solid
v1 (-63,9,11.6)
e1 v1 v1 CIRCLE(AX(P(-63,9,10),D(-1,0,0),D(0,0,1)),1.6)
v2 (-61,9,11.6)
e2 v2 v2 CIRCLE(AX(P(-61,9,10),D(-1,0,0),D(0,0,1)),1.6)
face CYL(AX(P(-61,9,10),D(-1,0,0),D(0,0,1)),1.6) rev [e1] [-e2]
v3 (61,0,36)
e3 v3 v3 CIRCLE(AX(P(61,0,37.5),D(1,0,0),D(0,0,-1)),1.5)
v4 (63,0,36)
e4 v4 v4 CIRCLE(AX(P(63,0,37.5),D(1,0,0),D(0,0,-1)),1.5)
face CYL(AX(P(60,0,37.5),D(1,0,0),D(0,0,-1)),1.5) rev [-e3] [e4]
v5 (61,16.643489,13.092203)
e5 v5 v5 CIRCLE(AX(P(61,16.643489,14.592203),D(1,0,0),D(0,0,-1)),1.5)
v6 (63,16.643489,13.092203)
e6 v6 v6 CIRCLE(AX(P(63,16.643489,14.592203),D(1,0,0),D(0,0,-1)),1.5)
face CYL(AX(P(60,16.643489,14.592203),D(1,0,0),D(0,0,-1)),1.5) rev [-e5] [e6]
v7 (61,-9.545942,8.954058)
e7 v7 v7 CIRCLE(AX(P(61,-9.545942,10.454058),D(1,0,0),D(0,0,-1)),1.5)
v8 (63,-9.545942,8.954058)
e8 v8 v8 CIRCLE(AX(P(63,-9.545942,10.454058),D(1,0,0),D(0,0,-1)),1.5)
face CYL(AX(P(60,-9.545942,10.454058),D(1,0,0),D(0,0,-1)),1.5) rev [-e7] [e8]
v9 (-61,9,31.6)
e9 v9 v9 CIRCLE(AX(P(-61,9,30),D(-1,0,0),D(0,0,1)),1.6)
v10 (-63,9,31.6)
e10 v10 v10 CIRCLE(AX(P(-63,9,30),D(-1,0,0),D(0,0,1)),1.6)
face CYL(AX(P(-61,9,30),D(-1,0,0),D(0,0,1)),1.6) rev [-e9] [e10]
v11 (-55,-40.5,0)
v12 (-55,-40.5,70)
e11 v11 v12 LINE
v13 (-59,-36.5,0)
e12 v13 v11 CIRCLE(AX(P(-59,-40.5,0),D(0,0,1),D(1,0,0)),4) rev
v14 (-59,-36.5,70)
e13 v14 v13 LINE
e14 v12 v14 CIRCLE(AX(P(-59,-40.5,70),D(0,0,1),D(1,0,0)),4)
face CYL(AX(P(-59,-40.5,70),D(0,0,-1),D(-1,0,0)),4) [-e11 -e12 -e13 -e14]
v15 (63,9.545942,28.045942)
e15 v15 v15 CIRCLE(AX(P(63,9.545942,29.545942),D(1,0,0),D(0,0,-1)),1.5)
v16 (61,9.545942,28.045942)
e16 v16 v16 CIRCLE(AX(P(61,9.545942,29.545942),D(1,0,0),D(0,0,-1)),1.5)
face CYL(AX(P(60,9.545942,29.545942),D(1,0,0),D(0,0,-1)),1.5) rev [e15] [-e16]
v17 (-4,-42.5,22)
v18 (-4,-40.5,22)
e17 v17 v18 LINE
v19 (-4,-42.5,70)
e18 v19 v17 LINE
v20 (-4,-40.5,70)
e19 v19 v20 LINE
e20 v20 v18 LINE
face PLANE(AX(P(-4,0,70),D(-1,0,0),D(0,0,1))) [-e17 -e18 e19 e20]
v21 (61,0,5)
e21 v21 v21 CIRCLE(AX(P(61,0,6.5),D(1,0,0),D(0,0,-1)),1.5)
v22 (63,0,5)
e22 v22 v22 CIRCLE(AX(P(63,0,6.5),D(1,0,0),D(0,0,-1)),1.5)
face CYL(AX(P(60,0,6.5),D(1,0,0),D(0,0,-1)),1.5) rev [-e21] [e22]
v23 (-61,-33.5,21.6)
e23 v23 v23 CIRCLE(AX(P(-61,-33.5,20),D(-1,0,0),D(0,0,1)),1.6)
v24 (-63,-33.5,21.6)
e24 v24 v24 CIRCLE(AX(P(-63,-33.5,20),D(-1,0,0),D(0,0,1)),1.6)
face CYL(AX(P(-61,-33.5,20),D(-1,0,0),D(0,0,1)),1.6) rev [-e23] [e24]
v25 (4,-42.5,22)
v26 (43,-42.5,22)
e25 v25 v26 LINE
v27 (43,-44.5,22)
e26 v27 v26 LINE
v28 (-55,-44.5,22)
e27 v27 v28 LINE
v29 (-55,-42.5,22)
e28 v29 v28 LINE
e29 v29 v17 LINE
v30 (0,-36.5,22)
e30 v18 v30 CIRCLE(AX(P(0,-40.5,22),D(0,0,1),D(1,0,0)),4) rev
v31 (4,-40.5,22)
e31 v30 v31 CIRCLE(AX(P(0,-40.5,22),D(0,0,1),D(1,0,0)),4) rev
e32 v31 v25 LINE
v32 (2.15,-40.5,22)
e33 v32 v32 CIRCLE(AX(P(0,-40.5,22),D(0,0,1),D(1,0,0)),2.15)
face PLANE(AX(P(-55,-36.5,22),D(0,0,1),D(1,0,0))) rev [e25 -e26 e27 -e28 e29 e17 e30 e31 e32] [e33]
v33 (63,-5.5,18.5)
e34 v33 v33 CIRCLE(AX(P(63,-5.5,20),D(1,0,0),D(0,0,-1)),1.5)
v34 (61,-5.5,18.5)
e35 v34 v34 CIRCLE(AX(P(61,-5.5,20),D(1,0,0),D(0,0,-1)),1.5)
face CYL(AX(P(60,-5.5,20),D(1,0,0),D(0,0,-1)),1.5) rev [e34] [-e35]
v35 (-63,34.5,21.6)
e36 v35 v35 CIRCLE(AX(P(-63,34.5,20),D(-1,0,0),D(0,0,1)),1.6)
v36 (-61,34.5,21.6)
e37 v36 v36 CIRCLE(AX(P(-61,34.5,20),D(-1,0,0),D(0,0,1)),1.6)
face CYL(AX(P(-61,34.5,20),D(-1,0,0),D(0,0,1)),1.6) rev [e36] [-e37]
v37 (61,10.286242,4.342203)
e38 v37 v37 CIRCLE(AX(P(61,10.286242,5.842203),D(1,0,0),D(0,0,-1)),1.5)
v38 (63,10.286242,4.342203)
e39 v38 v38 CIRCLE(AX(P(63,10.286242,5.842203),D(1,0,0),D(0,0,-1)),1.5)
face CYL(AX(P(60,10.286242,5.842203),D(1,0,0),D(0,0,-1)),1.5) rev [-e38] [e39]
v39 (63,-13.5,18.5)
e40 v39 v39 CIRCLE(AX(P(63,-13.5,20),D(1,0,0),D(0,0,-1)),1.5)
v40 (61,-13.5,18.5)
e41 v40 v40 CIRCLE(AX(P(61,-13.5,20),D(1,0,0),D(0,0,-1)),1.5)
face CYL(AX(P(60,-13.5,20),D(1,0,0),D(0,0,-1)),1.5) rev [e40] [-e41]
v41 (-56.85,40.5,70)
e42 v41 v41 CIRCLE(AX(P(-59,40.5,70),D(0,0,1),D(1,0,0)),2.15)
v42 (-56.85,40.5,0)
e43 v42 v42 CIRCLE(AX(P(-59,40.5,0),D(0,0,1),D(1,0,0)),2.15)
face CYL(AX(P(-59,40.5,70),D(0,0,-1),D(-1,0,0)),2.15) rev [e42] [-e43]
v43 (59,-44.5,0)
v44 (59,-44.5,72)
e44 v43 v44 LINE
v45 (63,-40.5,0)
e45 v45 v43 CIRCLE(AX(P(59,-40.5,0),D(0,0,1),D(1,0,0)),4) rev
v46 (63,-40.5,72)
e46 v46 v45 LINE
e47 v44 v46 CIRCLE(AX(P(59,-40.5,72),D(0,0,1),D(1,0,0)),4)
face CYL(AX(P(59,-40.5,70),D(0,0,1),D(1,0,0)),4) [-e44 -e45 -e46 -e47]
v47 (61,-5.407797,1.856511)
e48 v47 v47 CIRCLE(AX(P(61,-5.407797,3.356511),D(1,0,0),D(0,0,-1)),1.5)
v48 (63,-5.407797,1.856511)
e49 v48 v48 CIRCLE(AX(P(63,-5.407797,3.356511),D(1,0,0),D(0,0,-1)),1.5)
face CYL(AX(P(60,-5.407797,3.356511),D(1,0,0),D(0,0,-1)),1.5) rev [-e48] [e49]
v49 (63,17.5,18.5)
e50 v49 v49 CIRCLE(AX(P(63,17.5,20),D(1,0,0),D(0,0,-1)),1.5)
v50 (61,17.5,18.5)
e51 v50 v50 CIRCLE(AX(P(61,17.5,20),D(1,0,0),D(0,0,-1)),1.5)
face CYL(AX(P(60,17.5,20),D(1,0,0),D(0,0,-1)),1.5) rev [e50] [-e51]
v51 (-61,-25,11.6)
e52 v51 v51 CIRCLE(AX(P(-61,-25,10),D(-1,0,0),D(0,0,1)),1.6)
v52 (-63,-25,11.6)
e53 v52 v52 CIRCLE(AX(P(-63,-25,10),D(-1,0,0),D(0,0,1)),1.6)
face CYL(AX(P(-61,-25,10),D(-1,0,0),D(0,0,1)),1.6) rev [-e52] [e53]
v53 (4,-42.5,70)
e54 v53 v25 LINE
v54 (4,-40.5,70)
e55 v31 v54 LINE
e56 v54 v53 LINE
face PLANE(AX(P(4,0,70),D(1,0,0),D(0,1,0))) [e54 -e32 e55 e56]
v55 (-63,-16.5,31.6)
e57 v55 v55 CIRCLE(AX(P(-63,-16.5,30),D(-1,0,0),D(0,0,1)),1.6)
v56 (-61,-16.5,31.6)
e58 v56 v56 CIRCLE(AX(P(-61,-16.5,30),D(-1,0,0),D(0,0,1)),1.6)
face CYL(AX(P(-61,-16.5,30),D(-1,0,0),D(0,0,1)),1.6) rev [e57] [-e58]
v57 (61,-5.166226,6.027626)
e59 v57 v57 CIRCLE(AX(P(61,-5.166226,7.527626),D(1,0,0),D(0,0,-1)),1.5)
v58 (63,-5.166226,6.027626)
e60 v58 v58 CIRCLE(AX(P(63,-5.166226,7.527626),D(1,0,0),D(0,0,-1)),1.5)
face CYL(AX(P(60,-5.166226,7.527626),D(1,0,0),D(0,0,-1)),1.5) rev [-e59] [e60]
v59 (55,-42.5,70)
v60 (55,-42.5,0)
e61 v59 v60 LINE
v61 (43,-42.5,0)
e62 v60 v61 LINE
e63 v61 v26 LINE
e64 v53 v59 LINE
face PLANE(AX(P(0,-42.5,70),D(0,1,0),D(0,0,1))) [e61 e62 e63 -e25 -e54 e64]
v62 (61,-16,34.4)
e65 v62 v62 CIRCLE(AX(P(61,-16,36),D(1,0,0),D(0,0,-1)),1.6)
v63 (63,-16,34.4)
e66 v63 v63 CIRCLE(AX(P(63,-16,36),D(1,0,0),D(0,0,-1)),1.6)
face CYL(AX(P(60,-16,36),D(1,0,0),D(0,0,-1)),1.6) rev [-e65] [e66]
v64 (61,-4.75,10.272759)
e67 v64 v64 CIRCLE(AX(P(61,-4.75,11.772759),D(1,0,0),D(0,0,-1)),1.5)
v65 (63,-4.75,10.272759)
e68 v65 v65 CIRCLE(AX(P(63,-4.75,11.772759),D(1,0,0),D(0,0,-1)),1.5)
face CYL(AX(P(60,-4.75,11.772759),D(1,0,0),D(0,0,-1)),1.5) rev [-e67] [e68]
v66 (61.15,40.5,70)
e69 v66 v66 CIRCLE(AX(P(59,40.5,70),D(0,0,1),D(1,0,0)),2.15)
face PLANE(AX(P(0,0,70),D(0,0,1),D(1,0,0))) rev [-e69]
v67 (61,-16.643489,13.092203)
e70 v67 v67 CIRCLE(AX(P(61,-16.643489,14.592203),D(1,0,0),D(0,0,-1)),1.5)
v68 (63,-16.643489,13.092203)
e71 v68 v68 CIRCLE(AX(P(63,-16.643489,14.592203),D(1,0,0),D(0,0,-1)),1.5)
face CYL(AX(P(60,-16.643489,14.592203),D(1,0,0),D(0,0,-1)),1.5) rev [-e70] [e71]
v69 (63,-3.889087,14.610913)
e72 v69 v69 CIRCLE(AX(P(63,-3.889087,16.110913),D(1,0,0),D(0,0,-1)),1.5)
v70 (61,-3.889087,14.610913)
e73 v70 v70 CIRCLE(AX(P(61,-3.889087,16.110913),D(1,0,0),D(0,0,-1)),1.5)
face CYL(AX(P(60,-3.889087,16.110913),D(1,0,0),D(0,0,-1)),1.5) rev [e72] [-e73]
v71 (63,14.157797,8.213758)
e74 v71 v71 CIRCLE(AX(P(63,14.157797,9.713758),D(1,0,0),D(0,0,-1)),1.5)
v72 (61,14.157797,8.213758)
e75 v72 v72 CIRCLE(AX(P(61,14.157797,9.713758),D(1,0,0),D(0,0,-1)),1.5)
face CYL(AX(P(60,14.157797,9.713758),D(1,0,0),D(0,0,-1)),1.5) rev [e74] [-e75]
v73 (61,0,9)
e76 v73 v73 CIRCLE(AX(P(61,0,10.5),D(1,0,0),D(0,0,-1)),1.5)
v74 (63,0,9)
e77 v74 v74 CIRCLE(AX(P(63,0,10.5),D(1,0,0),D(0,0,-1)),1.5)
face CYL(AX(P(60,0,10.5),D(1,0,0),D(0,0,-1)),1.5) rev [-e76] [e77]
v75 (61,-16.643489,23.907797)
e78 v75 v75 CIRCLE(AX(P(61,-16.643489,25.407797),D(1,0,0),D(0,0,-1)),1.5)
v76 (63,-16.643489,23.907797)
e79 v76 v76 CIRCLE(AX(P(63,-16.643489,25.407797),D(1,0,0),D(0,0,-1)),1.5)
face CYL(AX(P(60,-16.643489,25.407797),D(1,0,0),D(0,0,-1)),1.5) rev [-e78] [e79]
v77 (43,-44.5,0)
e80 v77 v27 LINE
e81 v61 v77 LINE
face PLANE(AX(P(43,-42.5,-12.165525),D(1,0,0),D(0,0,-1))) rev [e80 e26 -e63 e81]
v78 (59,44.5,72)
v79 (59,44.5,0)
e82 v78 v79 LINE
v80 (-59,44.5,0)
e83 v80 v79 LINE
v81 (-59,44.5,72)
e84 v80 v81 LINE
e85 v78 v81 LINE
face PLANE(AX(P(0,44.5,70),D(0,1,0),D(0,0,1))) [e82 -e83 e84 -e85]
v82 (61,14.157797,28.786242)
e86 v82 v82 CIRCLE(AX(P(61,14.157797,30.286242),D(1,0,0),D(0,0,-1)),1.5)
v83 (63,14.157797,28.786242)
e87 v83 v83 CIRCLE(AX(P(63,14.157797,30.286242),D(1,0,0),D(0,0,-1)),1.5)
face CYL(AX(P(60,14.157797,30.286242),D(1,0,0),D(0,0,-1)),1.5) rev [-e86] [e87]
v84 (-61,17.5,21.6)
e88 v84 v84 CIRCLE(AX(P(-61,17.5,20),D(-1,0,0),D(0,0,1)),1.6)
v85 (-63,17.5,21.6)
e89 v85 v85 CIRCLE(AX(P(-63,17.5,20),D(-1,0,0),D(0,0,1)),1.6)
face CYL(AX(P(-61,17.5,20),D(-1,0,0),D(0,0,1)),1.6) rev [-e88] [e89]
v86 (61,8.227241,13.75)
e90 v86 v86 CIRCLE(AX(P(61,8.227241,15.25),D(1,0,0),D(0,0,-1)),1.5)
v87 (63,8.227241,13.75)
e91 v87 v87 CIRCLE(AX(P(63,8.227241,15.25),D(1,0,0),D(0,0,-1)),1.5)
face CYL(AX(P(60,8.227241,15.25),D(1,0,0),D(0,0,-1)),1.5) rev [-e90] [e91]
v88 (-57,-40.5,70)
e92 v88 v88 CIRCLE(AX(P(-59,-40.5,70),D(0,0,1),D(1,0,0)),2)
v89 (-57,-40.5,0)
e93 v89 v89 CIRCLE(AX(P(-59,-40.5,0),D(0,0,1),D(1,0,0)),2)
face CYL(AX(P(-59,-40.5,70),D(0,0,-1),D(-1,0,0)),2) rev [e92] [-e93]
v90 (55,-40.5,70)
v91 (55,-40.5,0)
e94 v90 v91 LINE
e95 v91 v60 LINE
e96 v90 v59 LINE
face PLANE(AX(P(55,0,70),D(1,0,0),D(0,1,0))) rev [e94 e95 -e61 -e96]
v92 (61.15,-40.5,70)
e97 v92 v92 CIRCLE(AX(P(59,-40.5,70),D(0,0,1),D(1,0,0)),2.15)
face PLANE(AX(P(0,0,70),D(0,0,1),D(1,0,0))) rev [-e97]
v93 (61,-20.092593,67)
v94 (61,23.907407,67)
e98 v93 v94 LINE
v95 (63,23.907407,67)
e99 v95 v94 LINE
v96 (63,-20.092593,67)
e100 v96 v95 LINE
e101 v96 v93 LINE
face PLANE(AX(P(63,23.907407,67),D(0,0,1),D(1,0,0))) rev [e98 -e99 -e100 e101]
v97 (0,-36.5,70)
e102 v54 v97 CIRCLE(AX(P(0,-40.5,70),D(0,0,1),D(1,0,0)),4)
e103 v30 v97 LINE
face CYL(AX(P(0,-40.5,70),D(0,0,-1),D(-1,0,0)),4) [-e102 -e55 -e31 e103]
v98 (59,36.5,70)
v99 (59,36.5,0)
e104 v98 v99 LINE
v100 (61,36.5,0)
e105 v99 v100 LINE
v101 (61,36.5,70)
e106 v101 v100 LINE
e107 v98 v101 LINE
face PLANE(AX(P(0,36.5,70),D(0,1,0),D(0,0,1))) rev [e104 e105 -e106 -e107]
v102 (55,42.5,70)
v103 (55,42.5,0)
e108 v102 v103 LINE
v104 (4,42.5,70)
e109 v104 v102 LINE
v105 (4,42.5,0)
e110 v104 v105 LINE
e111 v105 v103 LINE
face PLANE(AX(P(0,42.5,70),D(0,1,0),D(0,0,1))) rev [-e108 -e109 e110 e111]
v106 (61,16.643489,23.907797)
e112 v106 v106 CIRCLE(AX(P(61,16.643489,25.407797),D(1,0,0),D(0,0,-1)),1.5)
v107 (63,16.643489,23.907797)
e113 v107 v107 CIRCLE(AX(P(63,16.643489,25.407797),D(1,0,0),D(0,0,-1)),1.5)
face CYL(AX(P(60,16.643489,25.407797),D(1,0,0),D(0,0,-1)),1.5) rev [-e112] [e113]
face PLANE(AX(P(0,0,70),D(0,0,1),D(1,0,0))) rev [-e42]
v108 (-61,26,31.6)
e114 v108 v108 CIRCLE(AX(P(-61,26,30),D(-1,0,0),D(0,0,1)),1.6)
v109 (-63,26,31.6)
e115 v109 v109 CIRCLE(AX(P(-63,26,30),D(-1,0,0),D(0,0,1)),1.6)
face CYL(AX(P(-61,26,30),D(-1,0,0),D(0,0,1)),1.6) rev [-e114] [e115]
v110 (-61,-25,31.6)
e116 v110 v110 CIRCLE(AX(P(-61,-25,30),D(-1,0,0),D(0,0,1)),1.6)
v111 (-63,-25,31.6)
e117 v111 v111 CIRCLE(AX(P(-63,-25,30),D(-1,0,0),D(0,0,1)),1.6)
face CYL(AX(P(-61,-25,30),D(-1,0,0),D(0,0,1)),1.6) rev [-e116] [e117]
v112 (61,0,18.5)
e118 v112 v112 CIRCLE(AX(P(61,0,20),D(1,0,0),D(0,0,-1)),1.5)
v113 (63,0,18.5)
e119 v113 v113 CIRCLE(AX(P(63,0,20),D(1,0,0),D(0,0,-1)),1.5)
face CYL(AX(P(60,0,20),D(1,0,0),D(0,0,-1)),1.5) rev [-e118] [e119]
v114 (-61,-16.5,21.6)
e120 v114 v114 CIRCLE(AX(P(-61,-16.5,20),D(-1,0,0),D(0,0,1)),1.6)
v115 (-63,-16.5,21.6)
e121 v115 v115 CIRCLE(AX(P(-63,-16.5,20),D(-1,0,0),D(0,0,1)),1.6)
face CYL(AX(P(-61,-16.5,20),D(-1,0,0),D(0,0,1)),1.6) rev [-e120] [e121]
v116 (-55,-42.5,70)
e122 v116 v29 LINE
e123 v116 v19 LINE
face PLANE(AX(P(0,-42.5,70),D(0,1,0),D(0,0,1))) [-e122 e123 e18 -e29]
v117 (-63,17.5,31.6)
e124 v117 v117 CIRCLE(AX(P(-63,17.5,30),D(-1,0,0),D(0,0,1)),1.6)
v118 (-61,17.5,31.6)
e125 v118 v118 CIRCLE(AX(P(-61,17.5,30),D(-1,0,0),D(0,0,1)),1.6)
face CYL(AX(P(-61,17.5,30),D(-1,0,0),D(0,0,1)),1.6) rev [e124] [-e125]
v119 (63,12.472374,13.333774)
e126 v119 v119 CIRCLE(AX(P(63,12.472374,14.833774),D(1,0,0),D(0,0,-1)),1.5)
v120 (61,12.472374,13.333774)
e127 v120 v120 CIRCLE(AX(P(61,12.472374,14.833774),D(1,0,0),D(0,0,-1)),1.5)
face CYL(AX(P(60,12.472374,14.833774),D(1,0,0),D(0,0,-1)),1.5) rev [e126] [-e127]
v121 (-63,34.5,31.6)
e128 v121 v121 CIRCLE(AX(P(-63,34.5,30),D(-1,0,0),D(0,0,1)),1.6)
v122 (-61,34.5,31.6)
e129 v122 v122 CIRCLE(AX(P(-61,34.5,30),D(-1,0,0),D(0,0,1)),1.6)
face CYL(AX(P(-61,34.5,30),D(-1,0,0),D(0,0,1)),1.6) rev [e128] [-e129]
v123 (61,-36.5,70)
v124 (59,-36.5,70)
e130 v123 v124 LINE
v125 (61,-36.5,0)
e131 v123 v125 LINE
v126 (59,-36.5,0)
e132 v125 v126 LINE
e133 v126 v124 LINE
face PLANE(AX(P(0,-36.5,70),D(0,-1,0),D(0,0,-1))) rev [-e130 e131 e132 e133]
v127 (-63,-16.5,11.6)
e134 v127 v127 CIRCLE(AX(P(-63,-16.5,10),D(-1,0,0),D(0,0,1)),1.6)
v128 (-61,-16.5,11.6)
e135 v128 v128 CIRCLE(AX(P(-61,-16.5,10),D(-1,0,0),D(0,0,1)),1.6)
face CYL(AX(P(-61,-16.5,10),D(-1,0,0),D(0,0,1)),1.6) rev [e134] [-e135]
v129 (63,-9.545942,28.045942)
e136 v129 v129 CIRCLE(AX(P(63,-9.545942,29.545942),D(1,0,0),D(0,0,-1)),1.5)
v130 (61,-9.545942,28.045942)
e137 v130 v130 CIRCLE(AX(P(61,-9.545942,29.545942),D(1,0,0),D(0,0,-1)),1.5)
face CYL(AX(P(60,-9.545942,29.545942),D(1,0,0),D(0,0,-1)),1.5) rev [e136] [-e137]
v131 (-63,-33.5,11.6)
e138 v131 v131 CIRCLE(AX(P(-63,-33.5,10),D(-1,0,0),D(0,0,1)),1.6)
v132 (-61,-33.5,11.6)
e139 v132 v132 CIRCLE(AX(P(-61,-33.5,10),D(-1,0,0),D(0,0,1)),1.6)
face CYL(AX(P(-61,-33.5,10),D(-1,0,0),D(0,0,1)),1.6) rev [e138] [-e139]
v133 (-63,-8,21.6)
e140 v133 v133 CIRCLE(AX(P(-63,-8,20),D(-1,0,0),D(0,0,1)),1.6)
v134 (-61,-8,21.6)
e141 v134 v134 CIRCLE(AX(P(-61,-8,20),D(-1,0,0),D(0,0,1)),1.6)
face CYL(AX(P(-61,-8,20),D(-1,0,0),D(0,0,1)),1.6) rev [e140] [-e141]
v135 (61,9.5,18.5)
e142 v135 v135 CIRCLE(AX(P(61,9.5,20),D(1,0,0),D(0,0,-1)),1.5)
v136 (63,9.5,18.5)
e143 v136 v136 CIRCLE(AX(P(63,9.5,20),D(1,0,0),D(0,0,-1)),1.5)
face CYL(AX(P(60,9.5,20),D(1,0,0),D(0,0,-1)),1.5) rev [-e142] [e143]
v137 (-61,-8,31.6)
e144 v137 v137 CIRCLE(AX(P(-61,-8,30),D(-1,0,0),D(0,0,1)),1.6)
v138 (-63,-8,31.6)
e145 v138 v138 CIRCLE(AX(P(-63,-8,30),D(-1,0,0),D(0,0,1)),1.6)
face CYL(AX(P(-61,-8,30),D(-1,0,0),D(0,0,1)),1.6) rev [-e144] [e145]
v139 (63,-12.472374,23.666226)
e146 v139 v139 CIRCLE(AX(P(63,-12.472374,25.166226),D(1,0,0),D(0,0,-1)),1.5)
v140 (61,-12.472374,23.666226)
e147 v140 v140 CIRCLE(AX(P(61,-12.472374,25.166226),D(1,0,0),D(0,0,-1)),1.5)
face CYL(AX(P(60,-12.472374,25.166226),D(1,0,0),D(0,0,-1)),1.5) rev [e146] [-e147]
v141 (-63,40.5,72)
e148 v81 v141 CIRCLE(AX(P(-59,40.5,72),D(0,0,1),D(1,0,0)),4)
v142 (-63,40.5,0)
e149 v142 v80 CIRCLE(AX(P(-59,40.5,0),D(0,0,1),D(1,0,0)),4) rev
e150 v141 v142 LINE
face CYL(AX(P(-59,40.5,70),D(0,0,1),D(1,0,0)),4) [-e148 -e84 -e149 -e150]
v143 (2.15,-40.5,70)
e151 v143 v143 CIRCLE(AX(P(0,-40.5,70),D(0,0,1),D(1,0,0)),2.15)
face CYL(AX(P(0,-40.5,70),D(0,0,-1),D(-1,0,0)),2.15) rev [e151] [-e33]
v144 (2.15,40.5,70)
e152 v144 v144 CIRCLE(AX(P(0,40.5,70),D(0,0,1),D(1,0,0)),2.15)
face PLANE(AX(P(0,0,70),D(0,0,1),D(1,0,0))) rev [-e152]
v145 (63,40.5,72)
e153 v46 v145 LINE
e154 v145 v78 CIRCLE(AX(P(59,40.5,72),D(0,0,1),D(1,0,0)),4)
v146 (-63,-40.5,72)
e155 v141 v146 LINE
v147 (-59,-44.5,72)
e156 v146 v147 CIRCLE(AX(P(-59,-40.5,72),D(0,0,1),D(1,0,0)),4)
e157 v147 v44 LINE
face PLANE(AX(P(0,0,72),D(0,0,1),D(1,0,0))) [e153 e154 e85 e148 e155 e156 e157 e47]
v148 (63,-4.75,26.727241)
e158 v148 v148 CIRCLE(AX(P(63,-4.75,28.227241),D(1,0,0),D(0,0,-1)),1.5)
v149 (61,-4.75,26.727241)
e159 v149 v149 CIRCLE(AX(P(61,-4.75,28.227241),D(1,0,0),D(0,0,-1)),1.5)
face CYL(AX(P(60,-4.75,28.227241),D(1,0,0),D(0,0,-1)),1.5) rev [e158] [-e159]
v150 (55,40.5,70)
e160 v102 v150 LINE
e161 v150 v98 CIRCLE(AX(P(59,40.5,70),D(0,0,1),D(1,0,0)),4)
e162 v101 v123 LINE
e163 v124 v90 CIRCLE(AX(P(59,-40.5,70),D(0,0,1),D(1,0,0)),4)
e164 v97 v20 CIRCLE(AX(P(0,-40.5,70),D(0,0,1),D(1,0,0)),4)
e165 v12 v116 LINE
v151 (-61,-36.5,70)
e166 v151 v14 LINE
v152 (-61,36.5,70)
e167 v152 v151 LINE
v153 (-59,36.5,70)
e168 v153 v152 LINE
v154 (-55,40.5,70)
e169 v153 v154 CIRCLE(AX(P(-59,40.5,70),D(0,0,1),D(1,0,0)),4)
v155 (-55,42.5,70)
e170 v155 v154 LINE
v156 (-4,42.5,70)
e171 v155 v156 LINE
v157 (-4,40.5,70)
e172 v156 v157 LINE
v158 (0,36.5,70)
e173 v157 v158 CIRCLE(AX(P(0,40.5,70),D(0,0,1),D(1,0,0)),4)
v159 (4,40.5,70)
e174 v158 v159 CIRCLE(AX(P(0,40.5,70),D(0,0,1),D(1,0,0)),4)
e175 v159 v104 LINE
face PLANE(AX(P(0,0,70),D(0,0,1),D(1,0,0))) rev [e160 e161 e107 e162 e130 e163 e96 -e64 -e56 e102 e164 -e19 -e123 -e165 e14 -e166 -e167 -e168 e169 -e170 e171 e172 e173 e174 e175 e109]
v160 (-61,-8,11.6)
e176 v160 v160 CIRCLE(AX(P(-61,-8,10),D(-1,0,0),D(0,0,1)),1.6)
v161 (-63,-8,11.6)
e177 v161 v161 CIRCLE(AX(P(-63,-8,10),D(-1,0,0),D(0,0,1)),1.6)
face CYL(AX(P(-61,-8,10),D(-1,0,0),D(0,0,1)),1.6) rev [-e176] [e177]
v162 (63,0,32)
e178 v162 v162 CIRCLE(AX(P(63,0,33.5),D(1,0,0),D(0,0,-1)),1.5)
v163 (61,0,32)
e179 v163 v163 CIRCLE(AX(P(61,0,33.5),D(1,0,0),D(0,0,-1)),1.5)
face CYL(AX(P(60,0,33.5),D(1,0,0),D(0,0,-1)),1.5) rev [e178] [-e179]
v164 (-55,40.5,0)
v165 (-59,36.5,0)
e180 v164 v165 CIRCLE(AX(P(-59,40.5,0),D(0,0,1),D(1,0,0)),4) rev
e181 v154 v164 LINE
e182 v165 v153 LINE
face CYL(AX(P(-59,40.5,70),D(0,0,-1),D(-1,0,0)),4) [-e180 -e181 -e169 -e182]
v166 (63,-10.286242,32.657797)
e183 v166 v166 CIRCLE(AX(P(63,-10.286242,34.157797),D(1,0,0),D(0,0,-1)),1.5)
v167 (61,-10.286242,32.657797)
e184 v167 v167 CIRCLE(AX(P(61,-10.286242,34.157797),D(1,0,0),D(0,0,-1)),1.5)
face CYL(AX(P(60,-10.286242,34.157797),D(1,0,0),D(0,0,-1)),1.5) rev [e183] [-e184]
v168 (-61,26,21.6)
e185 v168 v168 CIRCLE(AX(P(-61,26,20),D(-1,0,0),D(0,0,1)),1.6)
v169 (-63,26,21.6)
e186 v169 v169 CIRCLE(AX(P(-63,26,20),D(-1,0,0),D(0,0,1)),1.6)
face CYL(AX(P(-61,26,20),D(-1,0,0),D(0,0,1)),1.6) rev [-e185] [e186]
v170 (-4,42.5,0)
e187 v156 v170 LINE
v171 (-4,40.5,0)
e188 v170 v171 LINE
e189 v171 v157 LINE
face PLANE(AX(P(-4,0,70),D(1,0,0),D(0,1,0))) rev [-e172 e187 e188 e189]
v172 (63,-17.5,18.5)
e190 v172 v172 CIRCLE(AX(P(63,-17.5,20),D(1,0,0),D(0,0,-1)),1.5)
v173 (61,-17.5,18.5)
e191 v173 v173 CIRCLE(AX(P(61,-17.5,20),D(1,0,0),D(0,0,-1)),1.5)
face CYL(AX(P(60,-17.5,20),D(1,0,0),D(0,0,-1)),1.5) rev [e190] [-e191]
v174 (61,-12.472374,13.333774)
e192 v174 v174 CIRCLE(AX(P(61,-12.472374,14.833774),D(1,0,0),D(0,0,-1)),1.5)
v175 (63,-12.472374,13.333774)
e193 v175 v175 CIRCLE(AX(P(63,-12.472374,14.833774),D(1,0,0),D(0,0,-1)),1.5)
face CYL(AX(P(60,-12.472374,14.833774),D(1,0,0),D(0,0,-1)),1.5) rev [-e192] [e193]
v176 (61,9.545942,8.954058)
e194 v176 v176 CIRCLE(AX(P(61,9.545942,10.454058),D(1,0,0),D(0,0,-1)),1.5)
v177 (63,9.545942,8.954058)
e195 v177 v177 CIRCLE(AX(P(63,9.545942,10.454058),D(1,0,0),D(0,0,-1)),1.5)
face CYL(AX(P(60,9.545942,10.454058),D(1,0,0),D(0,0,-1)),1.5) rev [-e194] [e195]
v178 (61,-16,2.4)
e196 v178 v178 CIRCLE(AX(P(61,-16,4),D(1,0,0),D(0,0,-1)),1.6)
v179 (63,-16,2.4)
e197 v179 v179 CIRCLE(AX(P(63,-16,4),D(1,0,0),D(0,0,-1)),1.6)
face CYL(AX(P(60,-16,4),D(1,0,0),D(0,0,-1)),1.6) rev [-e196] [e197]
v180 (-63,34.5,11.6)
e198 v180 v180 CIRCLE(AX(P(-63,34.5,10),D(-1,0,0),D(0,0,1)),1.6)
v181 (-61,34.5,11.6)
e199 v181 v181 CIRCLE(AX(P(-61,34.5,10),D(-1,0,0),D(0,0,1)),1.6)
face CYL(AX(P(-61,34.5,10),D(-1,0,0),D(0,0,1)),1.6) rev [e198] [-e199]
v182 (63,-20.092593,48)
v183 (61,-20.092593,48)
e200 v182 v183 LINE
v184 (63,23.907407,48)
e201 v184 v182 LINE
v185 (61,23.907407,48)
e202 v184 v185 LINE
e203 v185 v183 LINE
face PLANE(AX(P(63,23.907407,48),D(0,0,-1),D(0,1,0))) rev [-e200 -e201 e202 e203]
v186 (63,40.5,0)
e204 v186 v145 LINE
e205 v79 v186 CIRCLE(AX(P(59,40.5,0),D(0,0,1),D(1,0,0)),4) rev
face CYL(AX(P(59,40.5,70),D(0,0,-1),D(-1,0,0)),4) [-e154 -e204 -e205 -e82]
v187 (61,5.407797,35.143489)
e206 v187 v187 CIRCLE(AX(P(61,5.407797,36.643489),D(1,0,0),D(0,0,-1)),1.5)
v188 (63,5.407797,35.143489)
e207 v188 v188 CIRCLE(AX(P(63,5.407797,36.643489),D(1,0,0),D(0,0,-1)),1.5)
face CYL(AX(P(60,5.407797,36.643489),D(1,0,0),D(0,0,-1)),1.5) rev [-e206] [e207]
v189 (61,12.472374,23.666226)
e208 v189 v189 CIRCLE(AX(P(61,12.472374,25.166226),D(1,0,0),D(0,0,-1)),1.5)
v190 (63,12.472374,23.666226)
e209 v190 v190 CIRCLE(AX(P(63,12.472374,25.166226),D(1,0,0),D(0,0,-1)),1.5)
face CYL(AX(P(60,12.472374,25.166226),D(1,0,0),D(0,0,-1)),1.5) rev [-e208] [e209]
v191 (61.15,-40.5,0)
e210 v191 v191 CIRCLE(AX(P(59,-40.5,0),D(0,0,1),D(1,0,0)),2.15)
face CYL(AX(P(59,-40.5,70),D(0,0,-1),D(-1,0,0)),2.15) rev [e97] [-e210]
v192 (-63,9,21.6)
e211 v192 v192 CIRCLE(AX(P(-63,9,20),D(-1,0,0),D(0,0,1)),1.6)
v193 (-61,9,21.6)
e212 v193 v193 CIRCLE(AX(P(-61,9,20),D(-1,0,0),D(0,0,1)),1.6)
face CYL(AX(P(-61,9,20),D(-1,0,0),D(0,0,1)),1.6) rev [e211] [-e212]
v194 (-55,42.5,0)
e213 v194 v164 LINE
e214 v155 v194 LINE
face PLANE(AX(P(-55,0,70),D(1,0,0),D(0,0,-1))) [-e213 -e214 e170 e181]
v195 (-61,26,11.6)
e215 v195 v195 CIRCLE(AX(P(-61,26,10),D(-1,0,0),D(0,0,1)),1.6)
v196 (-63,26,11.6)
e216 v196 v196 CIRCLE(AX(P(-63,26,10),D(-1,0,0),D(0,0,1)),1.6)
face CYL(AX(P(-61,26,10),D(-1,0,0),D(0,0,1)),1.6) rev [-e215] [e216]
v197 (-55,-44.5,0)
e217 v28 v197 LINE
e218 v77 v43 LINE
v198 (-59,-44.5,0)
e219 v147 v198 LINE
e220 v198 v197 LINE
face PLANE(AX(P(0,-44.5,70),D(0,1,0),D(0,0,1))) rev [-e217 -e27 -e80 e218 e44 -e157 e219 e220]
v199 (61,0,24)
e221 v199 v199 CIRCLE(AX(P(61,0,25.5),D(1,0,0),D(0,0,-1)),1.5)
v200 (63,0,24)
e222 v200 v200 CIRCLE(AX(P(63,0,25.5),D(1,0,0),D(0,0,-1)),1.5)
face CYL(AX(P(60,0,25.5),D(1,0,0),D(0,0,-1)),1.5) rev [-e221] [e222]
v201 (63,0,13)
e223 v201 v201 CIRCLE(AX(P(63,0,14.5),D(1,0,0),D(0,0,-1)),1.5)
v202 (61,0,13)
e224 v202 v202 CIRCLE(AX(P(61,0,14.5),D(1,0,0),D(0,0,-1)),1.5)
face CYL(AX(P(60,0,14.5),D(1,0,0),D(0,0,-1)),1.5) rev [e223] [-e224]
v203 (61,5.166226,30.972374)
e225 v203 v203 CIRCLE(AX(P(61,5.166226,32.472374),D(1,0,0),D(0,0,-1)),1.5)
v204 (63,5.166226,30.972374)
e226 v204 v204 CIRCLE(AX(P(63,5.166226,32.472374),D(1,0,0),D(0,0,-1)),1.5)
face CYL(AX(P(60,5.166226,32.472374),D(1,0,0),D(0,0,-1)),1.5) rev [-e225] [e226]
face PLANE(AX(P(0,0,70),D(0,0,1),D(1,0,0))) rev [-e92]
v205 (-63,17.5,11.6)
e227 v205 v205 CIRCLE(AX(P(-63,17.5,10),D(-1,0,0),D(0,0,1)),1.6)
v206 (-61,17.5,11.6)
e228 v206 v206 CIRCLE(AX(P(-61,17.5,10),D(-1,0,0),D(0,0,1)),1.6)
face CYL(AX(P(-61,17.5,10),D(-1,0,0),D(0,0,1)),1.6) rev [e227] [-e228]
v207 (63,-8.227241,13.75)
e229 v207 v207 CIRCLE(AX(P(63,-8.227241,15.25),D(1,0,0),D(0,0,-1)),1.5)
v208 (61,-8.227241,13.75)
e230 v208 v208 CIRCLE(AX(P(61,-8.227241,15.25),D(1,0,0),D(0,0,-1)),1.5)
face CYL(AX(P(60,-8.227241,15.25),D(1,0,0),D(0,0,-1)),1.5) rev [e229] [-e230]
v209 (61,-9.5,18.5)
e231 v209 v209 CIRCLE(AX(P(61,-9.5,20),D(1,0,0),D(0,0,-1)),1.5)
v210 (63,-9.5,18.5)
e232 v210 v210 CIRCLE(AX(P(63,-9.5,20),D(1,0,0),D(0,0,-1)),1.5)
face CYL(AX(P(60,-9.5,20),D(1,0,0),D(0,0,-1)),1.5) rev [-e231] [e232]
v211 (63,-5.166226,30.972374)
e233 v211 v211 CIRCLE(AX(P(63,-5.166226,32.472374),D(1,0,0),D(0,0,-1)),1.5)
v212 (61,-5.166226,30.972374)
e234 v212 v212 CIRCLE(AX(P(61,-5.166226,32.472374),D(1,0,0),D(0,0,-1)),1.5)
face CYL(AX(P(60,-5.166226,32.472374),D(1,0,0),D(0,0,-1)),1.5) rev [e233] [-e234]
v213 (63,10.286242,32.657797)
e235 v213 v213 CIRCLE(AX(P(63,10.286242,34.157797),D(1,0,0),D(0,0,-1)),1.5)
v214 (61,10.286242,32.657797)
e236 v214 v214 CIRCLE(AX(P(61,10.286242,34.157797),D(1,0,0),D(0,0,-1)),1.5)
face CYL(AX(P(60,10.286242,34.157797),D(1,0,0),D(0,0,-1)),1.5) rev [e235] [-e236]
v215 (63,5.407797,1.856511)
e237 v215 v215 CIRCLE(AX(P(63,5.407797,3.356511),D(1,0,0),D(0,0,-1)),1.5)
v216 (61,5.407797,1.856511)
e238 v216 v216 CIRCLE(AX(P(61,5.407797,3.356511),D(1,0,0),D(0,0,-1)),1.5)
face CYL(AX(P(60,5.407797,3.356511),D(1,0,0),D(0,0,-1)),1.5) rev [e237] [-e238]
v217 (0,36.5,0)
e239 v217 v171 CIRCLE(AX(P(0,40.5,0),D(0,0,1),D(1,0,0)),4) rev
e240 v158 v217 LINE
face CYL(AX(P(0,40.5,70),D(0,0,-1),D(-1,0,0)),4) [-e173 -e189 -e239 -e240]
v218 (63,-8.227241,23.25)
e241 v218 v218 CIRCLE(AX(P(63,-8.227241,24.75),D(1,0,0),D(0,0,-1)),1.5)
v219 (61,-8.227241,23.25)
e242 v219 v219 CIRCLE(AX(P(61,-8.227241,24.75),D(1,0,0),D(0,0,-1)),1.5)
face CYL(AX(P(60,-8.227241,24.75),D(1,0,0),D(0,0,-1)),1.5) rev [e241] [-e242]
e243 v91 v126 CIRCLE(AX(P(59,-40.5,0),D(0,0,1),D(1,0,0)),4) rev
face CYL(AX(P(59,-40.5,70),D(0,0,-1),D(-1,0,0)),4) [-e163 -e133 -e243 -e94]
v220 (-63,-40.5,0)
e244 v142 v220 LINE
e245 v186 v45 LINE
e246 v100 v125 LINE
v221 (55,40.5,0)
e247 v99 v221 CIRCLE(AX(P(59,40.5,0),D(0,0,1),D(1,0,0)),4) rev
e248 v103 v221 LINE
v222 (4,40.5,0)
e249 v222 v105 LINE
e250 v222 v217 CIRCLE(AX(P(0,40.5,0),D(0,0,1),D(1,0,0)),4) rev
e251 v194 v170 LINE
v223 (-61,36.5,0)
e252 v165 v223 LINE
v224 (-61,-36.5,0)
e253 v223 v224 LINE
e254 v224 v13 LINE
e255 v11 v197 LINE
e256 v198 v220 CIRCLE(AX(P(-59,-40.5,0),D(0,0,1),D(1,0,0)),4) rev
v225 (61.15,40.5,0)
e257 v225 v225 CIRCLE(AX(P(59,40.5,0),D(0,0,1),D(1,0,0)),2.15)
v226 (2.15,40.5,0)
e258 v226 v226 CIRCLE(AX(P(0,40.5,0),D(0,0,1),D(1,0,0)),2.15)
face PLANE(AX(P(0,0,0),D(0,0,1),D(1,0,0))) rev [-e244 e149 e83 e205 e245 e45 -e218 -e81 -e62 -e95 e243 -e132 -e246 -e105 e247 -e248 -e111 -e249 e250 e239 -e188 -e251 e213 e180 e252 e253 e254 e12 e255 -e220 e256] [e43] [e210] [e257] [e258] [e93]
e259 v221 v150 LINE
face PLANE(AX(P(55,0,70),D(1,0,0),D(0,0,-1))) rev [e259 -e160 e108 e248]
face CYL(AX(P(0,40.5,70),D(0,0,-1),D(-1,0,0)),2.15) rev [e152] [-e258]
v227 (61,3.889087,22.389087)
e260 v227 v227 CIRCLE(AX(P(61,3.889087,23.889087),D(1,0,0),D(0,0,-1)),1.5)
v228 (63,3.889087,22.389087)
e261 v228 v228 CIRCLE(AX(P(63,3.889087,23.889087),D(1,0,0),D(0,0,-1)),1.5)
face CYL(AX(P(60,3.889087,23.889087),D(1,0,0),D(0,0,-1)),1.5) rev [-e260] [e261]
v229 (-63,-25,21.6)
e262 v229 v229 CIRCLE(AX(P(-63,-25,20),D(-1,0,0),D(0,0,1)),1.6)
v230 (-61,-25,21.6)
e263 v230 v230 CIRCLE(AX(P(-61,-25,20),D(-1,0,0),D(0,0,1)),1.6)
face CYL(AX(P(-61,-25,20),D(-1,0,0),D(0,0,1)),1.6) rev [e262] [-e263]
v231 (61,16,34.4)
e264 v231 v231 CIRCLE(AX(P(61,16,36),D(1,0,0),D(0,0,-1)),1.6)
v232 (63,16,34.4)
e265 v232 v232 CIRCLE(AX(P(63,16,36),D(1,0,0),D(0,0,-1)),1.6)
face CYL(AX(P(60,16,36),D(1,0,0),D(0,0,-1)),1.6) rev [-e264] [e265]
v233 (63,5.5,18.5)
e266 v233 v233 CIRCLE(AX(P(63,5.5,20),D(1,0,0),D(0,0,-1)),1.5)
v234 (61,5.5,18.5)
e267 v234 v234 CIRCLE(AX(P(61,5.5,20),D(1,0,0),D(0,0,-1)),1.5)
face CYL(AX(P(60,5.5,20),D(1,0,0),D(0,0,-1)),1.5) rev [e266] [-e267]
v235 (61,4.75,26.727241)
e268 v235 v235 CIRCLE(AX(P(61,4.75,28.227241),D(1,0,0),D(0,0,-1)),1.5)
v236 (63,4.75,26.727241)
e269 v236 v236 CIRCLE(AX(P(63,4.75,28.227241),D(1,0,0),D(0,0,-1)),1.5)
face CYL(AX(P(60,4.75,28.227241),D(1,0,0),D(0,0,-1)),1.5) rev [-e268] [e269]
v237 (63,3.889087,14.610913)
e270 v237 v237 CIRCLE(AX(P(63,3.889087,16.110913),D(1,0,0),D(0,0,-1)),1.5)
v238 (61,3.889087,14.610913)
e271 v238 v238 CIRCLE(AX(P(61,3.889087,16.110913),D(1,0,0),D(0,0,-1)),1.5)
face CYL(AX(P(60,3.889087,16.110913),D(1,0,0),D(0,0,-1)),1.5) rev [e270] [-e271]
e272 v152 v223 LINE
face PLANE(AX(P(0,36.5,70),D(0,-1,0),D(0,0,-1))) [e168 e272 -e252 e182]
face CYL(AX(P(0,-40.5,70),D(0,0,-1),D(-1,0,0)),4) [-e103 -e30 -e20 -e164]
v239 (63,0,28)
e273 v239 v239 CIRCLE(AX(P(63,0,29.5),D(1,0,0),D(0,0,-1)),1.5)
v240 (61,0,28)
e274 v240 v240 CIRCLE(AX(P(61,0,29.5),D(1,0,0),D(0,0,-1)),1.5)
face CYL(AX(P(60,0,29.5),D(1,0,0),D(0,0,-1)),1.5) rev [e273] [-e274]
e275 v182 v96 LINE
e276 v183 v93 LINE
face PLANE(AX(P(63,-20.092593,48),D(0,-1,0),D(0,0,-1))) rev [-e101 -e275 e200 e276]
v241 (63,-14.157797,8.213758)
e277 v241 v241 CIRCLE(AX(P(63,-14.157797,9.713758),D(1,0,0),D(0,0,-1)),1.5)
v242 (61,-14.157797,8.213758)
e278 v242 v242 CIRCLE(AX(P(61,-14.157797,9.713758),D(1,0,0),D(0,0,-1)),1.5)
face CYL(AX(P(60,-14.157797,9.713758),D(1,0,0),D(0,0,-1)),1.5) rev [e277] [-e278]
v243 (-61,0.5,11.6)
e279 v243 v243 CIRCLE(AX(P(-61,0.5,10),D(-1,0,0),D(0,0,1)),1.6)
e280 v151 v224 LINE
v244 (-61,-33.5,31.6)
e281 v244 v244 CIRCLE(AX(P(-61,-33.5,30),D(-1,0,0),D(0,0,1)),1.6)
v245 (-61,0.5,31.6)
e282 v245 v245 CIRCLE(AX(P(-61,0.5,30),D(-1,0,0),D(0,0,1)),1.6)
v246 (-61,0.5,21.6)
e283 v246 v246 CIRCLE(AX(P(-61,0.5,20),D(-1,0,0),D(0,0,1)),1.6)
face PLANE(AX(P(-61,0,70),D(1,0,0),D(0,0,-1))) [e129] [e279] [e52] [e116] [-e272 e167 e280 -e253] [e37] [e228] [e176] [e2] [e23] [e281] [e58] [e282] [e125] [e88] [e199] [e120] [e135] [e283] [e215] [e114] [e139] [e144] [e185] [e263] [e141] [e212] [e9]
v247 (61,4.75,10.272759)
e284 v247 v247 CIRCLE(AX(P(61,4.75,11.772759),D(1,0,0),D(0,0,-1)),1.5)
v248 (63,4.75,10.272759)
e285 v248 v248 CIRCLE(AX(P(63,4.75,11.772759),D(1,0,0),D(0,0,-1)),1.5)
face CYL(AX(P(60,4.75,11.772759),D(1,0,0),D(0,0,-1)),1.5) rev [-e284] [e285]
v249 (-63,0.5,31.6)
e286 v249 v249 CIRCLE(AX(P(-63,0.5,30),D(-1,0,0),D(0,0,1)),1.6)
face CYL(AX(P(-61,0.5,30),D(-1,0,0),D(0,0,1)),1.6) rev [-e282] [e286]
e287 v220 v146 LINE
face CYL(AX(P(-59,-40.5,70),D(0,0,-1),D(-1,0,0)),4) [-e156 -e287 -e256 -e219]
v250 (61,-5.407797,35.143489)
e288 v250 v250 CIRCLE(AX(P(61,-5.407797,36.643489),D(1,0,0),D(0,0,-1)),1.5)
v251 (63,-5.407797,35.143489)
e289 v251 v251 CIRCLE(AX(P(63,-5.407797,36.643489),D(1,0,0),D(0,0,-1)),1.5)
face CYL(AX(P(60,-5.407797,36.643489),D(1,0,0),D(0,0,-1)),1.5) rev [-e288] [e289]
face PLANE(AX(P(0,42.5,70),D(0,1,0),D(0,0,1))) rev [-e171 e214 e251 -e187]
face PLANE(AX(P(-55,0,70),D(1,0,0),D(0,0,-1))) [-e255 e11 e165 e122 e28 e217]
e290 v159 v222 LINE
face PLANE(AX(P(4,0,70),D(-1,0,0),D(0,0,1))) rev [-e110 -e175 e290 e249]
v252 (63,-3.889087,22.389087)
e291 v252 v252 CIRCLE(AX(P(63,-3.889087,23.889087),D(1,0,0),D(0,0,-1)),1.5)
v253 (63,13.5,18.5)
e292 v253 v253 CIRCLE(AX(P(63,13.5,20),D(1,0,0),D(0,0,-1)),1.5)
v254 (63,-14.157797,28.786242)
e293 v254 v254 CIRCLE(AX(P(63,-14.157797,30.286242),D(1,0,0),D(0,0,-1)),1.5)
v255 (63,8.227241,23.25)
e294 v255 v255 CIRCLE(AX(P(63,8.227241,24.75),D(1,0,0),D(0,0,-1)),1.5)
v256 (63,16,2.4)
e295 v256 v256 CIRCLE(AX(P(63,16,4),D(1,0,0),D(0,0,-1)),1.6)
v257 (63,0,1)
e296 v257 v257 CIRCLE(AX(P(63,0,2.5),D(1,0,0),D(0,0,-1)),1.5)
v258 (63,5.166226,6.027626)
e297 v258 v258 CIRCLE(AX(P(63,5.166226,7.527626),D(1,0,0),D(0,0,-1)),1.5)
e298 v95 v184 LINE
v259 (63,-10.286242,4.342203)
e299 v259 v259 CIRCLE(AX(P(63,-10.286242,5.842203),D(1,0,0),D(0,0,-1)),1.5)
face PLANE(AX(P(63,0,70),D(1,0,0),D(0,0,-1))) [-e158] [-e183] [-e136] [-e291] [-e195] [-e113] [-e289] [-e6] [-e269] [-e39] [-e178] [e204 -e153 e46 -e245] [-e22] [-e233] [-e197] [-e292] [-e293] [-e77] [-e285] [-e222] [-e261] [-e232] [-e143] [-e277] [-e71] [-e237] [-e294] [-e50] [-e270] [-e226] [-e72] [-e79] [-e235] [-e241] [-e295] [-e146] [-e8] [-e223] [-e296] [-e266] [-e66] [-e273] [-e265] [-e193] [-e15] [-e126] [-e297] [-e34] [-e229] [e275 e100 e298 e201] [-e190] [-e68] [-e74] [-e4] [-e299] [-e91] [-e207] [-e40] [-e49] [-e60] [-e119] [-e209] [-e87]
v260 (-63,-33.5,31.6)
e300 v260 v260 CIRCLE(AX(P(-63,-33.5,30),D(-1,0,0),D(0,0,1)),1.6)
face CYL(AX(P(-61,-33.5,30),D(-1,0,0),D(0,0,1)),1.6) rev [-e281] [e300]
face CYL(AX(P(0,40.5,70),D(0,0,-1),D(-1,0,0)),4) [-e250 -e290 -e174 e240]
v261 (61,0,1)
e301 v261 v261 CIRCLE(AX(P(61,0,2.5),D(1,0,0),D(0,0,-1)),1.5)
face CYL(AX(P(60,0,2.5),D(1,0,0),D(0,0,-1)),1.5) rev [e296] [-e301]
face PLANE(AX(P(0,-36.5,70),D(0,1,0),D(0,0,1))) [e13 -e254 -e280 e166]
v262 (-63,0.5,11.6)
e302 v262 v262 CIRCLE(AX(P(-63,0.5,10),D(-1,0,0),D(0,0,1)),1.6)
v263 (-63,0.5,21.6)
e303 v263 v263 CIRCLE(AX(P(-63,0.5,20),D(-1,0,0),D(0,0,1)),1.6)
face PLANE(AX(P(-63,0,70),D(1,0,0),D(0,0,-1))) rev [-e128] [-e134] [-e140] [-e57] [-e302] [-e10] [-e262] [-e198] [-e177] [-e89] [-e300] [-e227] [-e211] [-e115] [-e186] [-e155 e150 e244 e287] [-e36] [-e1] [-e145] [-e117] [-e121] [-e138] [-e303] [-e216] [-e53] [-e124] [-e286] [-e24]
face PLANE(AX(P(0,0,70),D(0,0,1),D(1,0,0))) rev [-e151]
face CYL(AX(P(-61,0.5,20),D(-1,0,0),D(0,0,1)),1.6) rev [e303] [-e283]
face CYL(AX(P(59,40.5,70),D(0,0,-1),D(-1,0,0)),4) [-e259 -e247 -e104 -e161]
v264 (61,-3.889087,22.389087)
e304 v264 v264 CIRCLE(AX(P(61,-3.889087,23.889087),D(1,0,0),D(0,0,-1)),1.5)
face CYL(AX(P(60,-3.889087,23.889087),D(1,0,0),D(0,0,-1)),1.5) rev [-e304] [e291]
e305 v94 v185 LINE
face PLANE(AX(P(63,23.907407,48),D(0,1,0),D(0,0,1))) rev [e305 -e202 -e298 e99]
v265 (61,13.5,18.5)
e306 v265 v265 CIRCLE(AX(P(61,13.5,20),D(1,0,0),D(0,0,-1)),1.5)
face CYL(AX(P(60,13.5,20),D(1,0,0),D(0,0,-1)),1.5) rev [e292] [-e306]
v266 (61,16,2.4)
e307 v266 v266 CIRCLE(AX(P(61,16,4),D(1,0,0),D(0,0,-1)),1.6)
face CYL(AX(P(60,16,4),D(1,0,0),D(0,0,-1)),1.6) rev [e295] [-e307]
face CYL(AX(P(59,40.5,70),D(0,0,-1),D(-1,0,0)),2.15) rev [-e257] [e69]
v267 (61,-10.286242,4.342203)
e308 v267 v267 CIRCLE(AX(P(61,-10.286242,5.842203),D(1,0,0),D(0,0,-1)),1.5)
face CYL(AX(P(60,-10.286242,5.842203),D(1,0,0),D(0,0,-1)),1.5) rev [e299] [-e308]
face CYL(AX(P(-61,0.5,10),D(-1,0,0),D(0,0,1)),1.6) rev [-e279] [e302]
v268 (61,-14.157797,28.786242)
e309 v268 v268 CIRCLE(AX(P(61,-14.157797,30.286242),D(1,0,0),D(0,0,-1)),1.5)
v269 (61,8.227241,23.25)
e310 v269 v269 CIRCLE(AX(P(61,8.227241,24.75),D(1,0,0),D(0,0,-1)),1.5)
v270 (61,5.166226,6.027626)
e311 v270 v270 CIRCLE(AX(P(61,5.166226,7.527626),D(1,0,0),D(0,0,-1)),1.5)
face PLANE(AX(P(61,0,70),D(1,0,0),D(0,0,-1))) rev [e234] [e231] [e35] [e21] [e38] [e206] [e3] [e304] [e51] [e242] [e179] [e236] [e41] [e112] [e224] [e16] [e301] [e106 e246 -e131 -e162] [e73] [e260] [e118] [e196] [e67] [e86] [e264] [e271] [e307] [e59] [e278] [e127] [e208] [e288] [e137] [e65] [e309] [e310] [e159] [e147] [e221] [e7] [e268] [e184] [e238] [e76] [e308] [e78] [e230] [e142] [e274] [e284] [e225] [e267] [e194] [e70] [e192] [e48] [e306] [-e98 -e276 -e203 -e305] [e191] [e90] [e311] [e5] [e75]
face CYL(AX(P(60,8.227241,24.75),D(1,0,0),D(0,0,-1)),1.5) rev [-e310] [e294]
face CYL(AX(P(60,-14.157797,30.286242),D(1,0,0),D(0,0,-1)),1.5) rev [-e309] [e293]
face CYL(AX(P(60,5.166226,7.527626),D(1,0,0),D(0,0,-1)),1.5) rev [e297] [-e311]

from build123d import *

# Parameters (mm, degrees)
SKETCH_1_W          = 126
SKETCH_1_H          = 89
SKETCH_1_R          = 2.15
SKETCH_1_R_2        = 2
EXTRUDE_4_DEPTH     = 70
SKETCH_3_W          = 126
SKETCH_3_H          = 89
EXTRUDE_5_DEPTH     = 2
SKETCH_4_R          = 1.6
SKETCH_4_R_2        = 1.5
CUT_EXTRUDE_1_DEPTH = 3
SKETCH_6_R          = 1.6
CUT_EXTRUDE_3_DEPTH = 2
SKETCH_8_W          = 110
SKETCH_8_H          = 22
CUT_EXTRUDE_4_DEPTH = 8
FILLET_3_R          = 4
SKETCH_9_W          = 19
SKETCH_9_H          = 44
CUT_EXTRUDE_5_DEPTH = 2
SKETCH_10_W         = 12
SKETCH_10_H         = 2
EXTRUDE_6_DEPTH     = 22


with BuildPart() as part:
    # 草图1 → 凸台-拉伸4 (new body)
    with BuildSketch(Plane.XY):
        Rectangle(SKETCH_1_W, SKETCH_1_H)
        Polygon((-4, 42.5), (-4, 36.5), (4, 36.5), (4, 42.5), (55, 42.5), (55, 36.5), (61, 36.5), (61, -36.5), (55, -36.5), (55, -42.5), (4, -42.5), (4, -36.5), (-4, -36.5), (-4, -42.5), (-55, -42.5), (-55, -36.5), (-61, -36.5), (-61, 36.5), (-55, 36.5), (-55, 42.5), align=None, mode=Mode.SUBTRACT)
        with Locations((0, 40.5)):
            Circle(SKETCH_1_R, mode=Mode.SUBTRACT)
        with Locations((-59, 40.5)):
            Circle(SKETCH_1_R, mode=Mode.SUBTRACT)
        with Locations((0, -40.5)):
            Circle(SKETCH_1_R, mode=Mode.SUBTRACT)
        with Locations((59, -40.5)):
            Circle(SKETCH_1_R, mode=Mode.SUBTRACT)
        with Locations((59, 40.5)):
            Circle(SKETCH_1_R, mode=Mode.SUBTRACT)
        with Locations((-59, -40.5)):
            Circle(SKETCH_1_R_2, mode=Mode.SUBTRACT)
    extrude(amount=EXTRUDE_4_DEPTH)

    # 草图3 → 凸台-拉伸5 (add)
    with BuildSketch(Plane.XY.offset(70)):
        Rectangle(SKETCH_3_W, SKETCH_3_H)
    extrude(amount=EXTRUDE_5_DEPTH)

    # 草图4 → 切除-拉伸1 (cut)
    with BuildSketch(Plane(origin=(63, 0, 0), x_dir=(0, 0, -1), z_dir=(1, 0, 0))):
        with Locations((-36, 16)):
            Circle(SKETCH_4_R)
        with Locations((-4, 16)):
            Circle(SKETCH_4_R)
        with Locations((-4, -16)):
            Circle(SKETCH_4_R)
        with Locations((-36, -16)):
            Circle(SKETCH_4_R)
        with Locations((-20, 17.5)):
            Circle(SKETCH_4_R_2)
        with Locations((-20, 0)):
            Circle(SKETCH_4_R_2)
        with Locations((-20, 9.5)):
            Circle(SKETCH_4_R_2)
        with Locations((-20, 13.5)):
            Circle(SKETCH_4_R_2)
        with Locations((-20, 5.5)):
            Circle(SKETCH_4_R_2)
        with Locations((-14.592202598, 16.643489035)):
            Circle(SKETCH_4_R_2)
        with Locations((-9.713758085, 14.157797402)):
            Circle(SKETCH_4_R_2)
        with Locations((-5.842202598, 10.286241915)):
            Circle(SKETCH_4_R_2)
        with Locations((-3.356510965, 5.407797402)):
            Circle(SKETCH_4_R_2)
        with Locations((-2.5, 0)):
            Circle(SKETCH_4_R_2)
        with Locations((-3.356510965, -5.407797402)):
            Circle(SKETCH_4_R_2)
        with Locations((-5.842202598, -10.286241915)):
            Circle(SKETCH_4_R_2)
        with Locations((-9.713758085, -14.157797402)):
            Circle(SKETCH_4_R_2)
        with Locations((-14.592202598, -16.643489035)):
            Circle(SKETCH_4_R_2)
        with Locations((-20, -17.5)):
            Circle(SKETCH_4_R_2)
        with Locations((-25.407797402, -16.643489035)):
            Circle(SKETCH_4_R_2)
        with Locations((-30.286241915, -14.157797402)):
            Circle(SKETCH_4_R_2)
        with Locations((-34.157797402, -10.286241915)):
            Circle(SKETCH_4_R_2)
        with Locations((-36.643489035, -5.407797402)):
            Circle(SKETCH_4_R_2)
        with Locations((-37.5, 0)):
            Circle(SKETCH_4_R_2)
        with Locations((-36.643489035, 5.407797402)):
            Circle(SKETCH_4_R_2)
        with Locations((-34.157797402, 10.286241915)):
            Circle(SKETCH_4_R_2)
        with Locations((-30.286241915, 14.157797402)):
            Circle(SKETCH_4_R_2)
        with Locations((-25.407797402, 16.643489035)):
            Circle(SKETCH_4_R_2)
        with Locations((-14.833773663, 12.472373689)):
            Circle(SKETCH_4_R_2)
        with Locations((-10.454058454, 9.545941546)):
            Circle(SKETCH_4_R_2)
        with Locations((-7.527626311, 5.166226337)):
            Circle(SKETCH_4_R_2)
        with Locations((-6.5, 0)):
            Circle(SKETCH_4_R_2)
        with Locations((-7.527626311, -5.166226337)):
            Circle(SKETCH_4_R_2)
        with Locations((-10.454058454, -9.545941546)):
            Circle(SKETCH_4_R_2)
        with Locations((-14.833773663, -12.472373689)):
            Circle(SKETCH_4_R_2)
        with Locations((-20, -13.5)):
            Circle(SKETCH_4_R_2)
        with Locations((-25.166226337, -12.472373689)):
            Circle(SKETCH_4_R_2)
        with Locations((-29.545941546, -9.545941546)):
            Circle(SKETCH_4_R_2)
        with Locations((-32.472373689, -5.166226337)):
            Circle(SKETCH_4_R_2)
        with Locations((-33.5, 0)):
            Circle(SKETCH_4_R_2)
        with Locations((-32.472373689, 5.166226337)):
            Circle(SKETCH_4_R_2)
        with Locations((-29.545941546, 9.545941546)):
            Circle(SKETCH_4_R_2)
        with Locations((-25.166226337, 12.472373689)):
            Circle(SKETCH_4_R_2)
        with Locations((-15.25, 8.227241336)):
            Circle(SKETCH_4_R_2)
        with Locations((-11.772758664, 4.75)):
            Circle(SKETCH_4_R_2)
        with Locations((-10.5, 0)):
            Circle(SKETCH_4_R_2)
        with Locations((-11.772758664, -4.75)):
            Circle(SKETCH_4_R_2)
        with Locations((-15.25, -8.227241336)):
            Circle(SKETCH_4_R_2)
        with Locations((-20, -9.5)):
            Circle(SKETCH_4_R_2)
        with Locations((-24.75, -8.227241336)):
            Circle(SKETCH_4_R_2)
        with Locations((-28.227241336, -4.75)):
            Circle(SKETCH_4_R_2)
        with Locations((-29.5, 0)):
            Circle(SKETCH_4_R_2)
        with Locations((-28.227241336, 4.75)):
            Circle(SKETCH_4_R_2)
        with Locations((-24.75, 8.227241336)):
            Circle(SKETCH_4_R_2)
        with Locations((-16.110912703, 3.889087297)):
            Circle(SKETCH_4_R_2)
        with Locations((-14.5, 0)):
            Circle(SKETCH_4_R_2)
        with Locations((-16.110912703, -3.889087297)):
            Circle(SKETCH_4_R_2)
        with Locations((-20, -5.5)):
            Circle(SKETCH_4_R_2)
        with Locations((-23.889087297, -3.889087297)):
            Circle(SKETCH_4_R_2)
        with Locations((-25.5, 0)):
            Circle(SKETCH_4_R_2)
        with Locations((-23.889087297, 3.889087297)):
            Circle(SKETCH_4_R_2)
    extrude(amount=-CUT_EXTRUDE_1_DEPTH, mode=Mode.SUBTRACT)

    # 草图6 → 切除-拉伸3 (cut)
    with BuildSketch(Plane.ZY.offset(63)):
        with Locations((10, 34.5)):
            Circle(SKETCH_6_R)
        with Locations((20, 34.5)):
            Circle(SKETCH_6_R)
        with Locations((30, 34.5)):
            Circle(SKETCH_6_R)
        with Locations((20, 26)):
            Circle(SKETCH_6_R)
        with Locations((30, 26)):
            Circle(SKETCH_6_R)
        with Locations((20, 17.5)):
            Circle(SKETCH_6_R)
        with Locations((30, 17.5)):
            Circle(SKETCH_6_R)
        with Locations((20, 9)):
            Circle(SKETCH_6_R)
        with Locations((30, 9)):
            Circle(SKETCH_6_R)
        with Locations((20, 0.5)):
            Circle(SKETCH_6_R)
        with Locations((30, 0.5)):
            Circle(SKETCH_6_R)
        with Locations((20, -8)):
            Circle(SKETCH_6_R)
        with Locations((30, -8)):
            Circle(SKETCH_6_R)
        with Locations((20, -16.5)):
            Circle(SKETCH_6_R)
        with Locations((30, -16.5)):
            Circle(SKETCH_6_R)
        with Locations((20, -25)):
            Circle(SKETCH_6_R)
        with Locations((30, -25)):
            Circle(SKETCH_6_R)
        with Locations((20, -33.5)):
            Circle(SKETCH_6_R)
        with Locations((30, -33.5)):
            Circle(SKETCH_6_R)
        with Locations((10, 26)):
            Circle(SKETCH_6_R)
        with Locations((10, 17.5)):
            Circle(SKETCH_6_R)
        with Locations((10, 9)):
            Circle(SKETCH_6_R)
        with Locations((10, 0.5)):
            Circle(SKETCH_6_R)
        with Locations((10, -8)):
            Circle(SKETCH_6_R)
        with Locations((10, -16.5)):
            Circle(SKETCH_6_R)
        with Locations((10, -25)):
            Circle(SKETCH_6_R)
        with Locations((10, -33.5)):
            Circle(SKETCH_6_R)
    extrude(amount=-CUT_EXTRUDE_3_DEPTH, mode=Mode.SUBTRACT)

    # 草图8 → 切除-拉伸4 (cut)
    with BuildSketch(Plane.XZ.offset(44.5)):
        with Locations((0, 11)):
            Rectangle(SKETCH_8_W, SKETCH_8_H)
    extrude(amount=-CUT_EXTRUDE_4_DEPTH, mode=Mode.SUBTRACT)

    # 圆角3
    fillet_3_edges = [part.edges().sort_by_distance(p)[0] for p in [
        (-55, 36.5, 35),
        (-55, -36.5, 35),
        (-63, 44.5, 36),
        (-63, -44.5, 36),
        (4, -36.5, 46),
        (-4, -36.5, 46),
        (4, 36.5, 35),
        (-4, 36.5, 35),
        (55, -36.5, 35),
        (63, -44.5, 36),
        (63, 44.5, 36),
        (55, 36.5, 35),
    ]]
    fillet(fillet_3_edges, radius=FILLET_3_R - 0.0001)  # a hair under: the kernel refuses the full size

    # 草图9 → 切除-拉伸5 (cut)
    with BuildSketch(Plane.ZY.offset(-61)):
        with Locations((57.5, 1.907407407)):
            Rectangle(SKETCH_9_W, SKETCH_9_H)
    extrude(amount=-CUT_EXTRUDE_5_DEPTH, mode=Mode.SUBTRACT)

    # 草图10 → 凸台-拉伸6 (add)
    with BuildSketch(Plane(origin=(0, 0, 22), x_dir=(-1, 0, 0), z_dir=(0, 0, -1))):
        with Locations((-49, -43.5)):
            Rectangle(SKETCH_10_W, SKETCH_10_H)
    extrude(amount=EXTRUDE_6_DEPTH)


solid = part.part
